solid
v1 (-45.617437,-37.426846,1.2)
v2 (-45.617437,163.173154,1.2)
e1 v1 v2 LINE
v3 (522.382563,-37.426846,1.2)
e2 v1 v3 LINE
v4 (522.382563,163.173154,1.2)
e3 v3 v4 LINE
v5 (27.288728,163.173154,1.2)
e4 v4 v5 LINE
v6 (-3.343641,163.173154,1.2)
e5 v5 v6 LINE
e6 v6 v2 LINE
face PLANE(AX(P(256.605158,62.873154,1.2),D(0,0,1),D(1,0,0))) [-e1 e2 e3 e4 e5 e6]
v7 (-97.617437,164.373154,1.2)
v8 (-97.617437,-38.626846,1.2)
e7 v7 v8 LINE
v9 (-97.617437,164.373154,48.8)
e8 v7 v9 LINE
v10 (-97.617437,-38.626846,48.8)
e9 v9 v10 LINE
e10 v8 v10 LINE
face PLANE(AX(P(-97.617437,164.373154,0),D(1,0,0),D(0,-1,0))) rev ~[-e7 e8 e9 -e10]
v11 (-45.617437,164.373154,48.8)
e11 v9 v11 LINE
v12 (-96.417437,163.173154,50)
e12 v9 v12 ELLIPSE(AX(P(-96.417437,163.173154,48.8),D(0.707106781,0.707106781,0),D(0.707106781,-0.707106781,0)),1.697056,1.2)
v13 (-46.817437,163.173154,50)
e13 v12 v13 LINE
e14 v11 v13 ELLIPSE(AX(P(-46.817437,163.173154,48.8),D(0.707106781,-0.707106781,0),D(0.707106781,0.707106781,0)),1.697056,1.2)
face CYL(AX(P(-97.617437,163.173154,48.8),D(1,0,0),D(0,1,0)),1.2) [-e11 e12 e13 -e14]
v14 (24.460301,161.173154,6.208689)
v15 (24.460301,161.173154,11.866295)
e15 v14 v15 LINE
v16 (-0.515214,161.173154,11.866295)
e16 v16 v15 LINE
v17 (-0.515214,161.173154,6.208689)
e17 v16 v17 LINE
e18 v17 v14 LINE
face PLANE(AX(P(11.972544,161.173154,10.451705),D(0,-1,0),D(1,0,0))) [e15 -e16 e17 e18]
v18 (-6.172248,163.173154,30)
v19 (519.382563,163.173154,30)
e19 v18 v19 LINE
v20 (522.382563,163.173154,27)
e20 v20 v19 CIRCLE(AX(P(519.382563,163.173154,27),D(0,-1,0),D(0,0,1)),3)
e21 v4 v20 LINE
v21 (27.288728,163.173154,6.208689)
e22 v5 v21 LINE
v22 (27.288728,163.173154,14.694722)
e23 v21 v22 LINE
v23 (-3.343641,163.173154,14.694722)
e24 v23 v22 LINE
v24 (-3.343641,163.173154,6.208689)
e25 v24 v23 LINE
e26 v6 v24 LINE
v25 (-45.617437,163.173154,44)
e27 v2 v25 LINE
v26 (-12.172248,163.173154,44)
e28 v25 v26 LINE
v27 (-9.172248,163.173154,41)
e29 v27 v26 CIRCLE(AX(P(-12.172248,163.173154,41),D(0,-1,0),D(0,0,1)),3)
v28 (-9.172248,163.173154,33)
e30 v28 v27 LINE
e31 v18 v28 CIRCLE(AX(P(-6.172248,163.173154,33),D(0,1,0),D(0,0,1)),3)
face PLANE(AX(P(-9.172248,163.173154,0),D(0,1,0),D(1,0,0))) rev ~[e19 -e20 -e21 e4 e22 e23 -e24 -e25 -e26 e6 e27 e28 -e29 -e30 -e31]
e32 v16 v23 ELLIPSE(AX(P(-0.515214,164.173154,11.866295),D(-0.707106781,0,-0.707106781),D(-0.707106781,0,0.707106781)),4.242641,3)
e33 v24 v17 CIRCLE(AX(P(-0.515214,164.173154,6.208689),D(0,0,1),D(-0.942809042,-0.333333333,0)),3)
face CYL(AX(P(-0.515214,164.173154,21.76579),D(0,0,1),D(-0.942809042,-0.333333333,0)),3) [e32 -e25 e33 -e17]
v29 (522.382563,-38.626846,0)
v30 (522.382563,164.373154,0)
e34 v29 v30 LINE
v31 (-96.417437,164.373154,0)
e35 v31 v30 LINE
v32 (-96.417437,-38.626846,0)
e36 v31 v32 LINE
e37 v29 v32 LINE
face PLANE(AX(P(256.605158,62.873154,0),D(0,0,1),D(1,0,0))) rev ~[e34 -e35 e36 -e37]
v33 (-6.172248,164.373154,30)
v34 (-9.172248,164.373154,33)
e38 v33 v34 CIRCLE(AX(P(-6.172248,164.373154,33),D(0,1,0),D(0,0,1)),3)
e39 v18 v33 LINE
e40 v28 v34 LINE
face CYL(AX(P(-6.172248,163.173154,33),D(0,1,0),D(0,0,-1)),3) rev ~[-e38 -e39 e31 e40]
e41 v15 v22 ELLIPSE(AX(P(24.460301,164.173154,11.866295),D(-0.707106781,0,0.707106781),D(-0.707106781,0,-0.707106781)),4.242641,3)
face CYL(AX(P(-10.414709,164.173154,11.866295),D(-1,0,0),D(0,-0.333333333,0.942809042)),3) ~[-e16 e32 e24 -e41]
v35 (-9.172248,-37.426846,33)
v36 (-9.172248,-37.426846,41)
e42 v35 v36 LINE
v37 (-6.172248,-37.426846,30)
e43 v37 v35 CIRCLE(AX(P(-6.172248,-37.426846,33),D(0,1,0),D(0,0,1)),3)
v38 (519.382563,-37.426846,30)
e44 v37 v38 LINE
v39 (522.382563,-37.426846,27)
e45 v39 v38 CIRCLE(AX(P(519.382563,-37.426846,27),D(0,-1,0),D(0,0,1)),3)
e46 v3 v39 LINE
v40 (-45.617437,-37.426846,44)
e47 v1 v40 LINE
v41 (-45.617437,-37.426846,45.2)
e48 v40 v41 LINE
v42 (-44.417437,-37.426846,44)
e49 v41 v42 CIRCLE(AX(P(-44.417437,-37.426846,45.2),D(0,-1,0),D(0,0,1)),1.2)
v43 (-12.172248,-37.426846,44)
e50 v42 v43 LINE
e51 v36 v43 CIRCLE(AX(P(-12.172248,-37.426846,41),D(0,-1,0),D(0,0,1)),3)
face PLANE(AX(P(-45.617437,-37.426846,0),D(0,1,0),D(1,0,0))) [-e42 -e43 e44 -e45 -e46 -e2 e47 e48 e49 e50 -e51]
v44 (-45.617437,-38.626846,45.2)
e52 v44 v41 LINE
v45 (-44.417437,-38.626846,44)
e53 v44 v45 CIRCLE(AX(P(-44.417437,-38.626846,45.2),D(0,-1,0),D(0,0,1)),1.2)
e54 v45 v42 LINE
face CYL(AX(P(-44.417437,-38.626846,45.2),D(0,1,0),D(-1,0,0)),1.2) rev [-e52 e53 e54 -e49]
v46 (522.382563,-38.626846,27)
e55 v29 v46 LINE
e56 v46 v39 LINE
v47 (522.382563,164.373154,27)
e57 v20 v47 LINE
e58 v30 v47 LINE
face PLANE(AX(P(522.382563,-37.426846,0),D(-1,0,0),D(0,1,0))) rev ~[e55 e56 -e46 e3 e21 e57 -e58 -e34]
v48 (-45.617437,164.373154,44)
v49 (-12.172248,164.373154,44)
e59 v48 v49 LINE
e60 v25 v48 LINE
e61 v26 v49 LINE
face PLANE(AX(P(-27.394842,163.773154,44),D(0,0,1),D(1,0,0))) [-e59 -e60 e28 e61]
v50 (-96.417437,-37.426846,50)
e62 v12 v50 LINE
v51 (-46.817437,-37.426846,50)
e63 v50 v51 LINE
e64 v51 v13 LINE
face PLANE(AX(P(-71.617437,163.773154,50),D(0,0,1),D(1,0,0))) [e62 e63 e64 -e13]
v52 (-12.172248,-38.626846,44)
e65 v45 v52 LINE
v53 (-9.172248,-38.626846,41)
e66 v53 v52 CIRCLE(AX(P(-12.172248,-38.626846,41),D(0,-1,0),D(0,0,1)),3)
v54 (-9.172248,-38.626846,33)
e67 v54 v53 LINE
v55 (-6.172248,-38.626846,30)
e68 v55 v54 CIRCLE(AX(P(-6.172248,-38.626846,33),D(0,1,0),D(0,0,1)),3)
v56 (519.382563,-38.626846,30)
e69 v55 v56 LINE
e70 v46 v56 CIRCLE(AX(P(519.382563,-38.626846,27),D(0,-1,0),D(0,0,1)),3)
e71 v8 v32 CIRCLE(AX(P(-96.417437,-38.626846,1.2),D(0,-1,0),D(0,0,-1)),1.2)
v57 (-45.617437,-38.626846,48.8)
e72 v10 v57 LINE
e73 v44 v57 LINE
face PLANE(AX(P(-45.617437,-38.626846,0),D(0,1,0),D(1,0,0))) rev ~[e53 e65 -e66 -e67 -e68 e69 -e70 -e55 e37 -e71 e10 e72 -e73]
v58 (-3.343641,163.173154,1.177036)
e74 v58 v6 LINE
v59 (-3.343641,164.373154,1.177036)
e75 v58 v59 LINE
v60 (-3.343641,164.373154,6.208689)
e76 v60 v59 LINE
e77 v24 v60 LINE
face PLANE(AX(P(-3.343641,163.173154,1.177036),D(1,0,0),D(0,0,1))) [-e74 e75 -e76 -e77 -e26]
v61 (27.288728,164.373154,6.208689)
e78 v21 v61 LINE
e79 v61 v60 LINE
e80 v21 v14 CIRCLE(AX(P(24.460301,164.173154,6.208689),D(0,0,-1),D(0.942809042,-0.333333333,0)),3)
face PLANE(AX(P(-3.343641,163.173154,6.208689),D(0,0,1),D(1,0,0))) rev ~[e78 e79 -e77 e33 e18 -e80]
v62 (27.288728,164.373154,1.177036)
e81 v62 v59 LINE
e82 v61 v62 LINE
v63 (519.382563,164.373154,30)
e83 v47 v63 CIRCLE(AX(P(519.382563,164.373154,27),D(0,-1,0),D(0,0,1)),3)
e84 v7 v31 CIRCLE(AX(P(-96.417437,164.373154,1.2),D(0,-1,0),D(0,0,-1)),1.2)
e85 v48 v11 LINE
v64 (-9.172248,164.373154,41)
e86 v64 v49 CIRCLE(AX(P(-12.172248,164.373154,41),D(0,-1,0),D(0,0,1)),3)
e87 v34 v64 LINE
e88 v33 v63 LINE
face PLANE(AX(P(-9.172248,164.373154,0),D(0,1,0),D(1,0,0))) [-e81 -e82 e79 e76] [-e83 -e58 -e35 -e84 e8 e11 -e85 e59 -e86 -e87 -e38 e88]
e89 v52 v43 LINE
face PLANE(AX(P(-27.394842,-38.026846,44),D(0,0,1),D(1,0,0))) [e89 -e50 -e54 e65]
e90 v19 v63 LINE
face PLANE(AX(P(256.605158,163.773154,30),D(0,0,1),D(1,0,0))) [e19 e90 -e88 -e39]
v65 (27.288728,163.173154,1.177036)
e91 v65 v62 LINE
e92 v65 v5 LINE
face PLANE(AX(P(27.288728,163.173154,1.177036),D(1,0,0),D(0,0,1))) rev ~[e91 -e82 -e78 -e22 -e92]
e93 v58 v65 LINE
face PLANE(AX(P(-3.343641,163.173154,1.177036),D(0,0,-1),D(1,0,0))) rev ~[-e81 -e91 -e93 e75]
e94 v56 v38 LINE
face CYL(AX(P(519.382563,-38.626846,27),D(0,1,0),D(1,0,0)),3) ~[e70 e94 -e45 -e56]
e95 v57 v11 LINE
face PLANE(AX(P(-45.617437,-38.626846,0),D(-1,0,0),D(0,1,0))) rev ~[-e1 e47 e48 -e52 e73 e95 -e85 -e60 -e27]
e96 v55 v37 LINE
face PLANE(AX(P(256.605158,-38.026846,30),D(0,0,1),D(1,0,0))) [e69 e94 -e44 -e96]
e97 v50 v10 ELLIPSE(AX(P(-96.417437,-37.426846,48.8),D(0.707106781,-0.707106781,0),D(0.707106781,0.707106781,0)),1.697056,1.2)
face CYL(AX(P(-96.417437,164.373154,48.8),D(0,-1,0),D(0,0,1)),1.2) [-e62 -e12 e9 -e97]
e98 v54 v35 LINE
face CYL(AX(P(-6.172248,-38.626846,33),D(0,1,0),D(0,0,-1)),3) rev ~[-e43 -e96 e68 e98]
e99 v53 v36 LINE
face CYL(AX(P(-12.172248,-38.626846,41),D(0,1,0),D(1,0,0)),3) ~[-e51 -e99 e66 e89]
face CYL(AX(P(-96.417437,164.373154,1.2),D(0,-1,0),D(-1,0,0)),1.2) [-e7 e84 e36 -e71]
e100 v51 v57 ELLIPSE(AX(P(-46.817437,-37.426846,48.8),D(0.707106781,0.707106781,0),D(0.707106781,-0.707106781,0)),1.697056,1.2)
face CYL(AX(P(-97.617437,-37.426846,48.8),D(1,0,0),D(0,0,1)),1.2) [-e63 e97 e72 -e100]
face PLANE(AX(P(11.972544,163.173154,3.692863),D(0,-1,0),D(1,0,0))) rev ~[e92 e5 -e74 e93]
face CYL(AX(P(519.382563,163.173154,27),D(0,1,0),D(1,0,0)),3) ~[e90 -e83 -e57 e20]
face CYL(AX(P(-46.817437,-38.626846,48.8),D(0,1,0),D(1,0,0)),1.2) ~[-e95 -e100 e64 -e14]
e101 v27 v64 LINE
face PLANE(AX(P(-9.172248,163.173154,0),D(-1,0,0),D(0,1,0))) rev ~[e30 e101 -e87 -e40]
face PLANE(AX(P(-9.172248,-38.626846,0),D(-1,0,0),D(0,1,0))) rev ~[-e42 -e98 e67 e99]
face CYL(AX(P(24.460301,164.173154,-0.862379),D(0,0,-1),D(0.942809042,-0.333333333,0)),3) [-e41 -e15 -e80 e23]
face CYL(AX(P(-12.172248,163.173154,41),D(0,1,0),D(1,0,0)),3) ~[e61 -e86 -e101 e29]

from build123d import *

# Parameters (mm, degrees)
F0_W          = 52
F0_H          = 1.2
F0_H_2        = 200.6
F1_DEPTH      = 50
F0_W_2        = 36.4451892475
F2_DEPTH      = 44
F0_W_3        = 531.5548107525
F3_DEPTH      = 30
F4_DEPTH      = 1.2
F5_R          = 1.2
F6_R          = 3
F7_W          = 30.6323694531
F7_H          = 5.0316524575
F8_DEPTH      = 25
F9_W          = 30.6323694531
F9_H          = 8.4860329516
F10_DEPTH     = 2
F11_T1_DEPTH  = 44.7745050768
F11_T6_DEPTH  = 22.6281685754
F11_T11_DEPTH = 22.6281685754


# Not quite as in the source:
# - a fillet or chamfer that OpenCascade refuses, or shapes differently, is made with other operations: its cross-section is extruded or revolved along the edge and cut away or added


with BuildPart() as f1:
    # F0 (on Top) → F1 (new body)
    with BuildSketch(Plane.XY):
        with Locations((-71.6174369702, 163.7731539965)):
            Rectangle(F0_W, F0_H)
        with Locations((-71.6174369702, 62.8731539965)):
            Rectangle(F0_W, F0_H_2)
        with Locations((-71.6174369702, -38.0268460035)):
            Rectangle(F0_W, F0_H)
    extrude(amount=F1_DEPTH)

    # F0 (on Top) → F2 (join)
    with BuildSketch(Plane.XY):
        with Locations((-27.3948423465, -38.0268460035)):
            Rectangle(F0_W_2, F0_H)
        with Locations((-27.3948423465, 163.7731539965)):
            Rectangle(F0_W_2, F0_H)
    extrude(amount=F2_DEPTH)

    # F0 (on Top) → F3 (join)
    with BuildSketch(Plane.XY):
        with Locations((256.6051576535, 163.7731539965)):
            Rectangle(F0_W_3, F0_H)
        with Locations((256.6051576535, -38.0268460035)):
            Rectangle(F0_W_3, F0_H)
    extrude(amount=F3_DEPTH)

    # F0 (on Top) → F4 (join)
    with BuildSketch(Plane.XY):
        with Locations((256.6051576535, 62.8731539965)):
            Rectangle(F0_W_3, F0_H_2)
        with Locations((-27.3948423465, 62.8731539965)):
            Rectangle(F0_W_2, F0_H_2)
    extrude(amount=F4_DEPTH)

    # F5
    f5_edges = [f1.edges().sort_by_distance(p)[0] for p in [
        (-71.617437, -38.626846, 50),
        (-71.617437, 164.373154, 50),
        (-97.617437, 62.873154, 50),
        (-97.617437, 62.873154, 0),
        (-45.617437, 62.873154, 50),
        (-45.617437, -38.026846, 44),
    ]]
    fillet(f5_edges, radius=F5_R)

    # F6
    f6_edges = [f1.edges().sort_by_distance(p)[0] for p in [
        (-9.172248, -38.026846, 44),
        (522.382563, -38.026846, 30),
        (522.382563, 163.773154, 30),
        (-9.172248, 163.773154, 44),
        (-9.172248, 163.773154, 30),
        (-9.172248, -38.026846, 30),
    ]]
    fillet(f6_edges, radius=F6_R)

    # F7 (on face) → F8 (cut)
    with BuildSketch(Plane.XZ.offset(-163.1731539965)):
        with Locations((11.9725436671, 3.6928627233)):
            Rectangle(F7_W, F7_H)
    extrude(amount=-F8_DEPTH, mode=Mode.SUBTRACT)

    # F9 (on face) → F10 (join)
    with BuildSketch(Plane.XZ.offset(-163.1731539965)):
        with Locations((11.9725436671, 10.4517054278)):
            Rectangle(F9_W, F9_H)
    extrude(amount=F10_DEPTH)

    # F11: fillet of radius 3 on 3 edges, made by hand

    # F11_s2 → F11_t1 (cut)
    with BuildSketch(Plane.YZ.offset(-10.4147088713)):
        with BuildLine():
            ThreePointArc((163.1731539965, 14.6947219037), (161.7236642537, 13.5983455865), (161.1731539965, 11.8662947789))
            Line((161.1731539965, 11.8662947789), (161.1731539965, 14.6947219037))
            Line((161.1731539965, 14.6947219037), (163.1731539965, 14.6947219037))
        make_face()
    extrude(amount=F11_T1_DEPTH, mode=Mode.SUBTRACT)


with BuildPart() as f11_tool4:
    # F11_s5 → F11_t6 (new body)
    with BuildSketch(Plane.XY.offset(-0.8623788598)):
        with BuildLine():
            ThreePointArc((27.2887283936, 163.1731539965), (26.1923520764, 161.7236642537), (24.4603012689, 161.1731539965))
            Line((24.4603012689, 161.1731539965), (27.2887283936, 161.1731539965))
            Line((27.2887283936, 161.1731539965), (27.2887283936, 163.1731539965))
        make_face()
    extrude(amount=F11_T6_DEPTH)

    split(bisect_by=Plane.XY.offset(1.2), keep=Keep.TOP)


with BuildPart() as f1_1:
    add(f1.part)

    # F11_t3: cut F11_tool4
    add(f11_tool4.part, mode=Mode.SUBTRACT)


with BuildPart() as f11_tool9:
    # F11_s10 → F11_t11 (new body)
    with BuildSketch(Plane.XY.offset(21.7657897155)):
        with BuildLine():
            ThreePointArc((-3.3436410595, 163.1731539965), (-2.2472647423, 161.7236642537), (-0.5152139347, 161.1731539965))
            Line((-0.5152139347, 161.1731539965), (-3.3436410595, 161.1731539965))
            Line((-3.3436410595, 161.1731539965), (-3.3436410595, 163.1731539965))
        make_face()
    extrude(amount=-F11_T11_DEPTH)

    split(bisect_by=Plane.XY.offset(1.2), keep=Keep.TOP)


with BuildPart() as f1_2:
    add(f1_1.part)

    # F11_t8: cut F11_tool9
    add(f11_tool9.part, mode=Mode.SUBTRACT)


solid = f1_2.part
